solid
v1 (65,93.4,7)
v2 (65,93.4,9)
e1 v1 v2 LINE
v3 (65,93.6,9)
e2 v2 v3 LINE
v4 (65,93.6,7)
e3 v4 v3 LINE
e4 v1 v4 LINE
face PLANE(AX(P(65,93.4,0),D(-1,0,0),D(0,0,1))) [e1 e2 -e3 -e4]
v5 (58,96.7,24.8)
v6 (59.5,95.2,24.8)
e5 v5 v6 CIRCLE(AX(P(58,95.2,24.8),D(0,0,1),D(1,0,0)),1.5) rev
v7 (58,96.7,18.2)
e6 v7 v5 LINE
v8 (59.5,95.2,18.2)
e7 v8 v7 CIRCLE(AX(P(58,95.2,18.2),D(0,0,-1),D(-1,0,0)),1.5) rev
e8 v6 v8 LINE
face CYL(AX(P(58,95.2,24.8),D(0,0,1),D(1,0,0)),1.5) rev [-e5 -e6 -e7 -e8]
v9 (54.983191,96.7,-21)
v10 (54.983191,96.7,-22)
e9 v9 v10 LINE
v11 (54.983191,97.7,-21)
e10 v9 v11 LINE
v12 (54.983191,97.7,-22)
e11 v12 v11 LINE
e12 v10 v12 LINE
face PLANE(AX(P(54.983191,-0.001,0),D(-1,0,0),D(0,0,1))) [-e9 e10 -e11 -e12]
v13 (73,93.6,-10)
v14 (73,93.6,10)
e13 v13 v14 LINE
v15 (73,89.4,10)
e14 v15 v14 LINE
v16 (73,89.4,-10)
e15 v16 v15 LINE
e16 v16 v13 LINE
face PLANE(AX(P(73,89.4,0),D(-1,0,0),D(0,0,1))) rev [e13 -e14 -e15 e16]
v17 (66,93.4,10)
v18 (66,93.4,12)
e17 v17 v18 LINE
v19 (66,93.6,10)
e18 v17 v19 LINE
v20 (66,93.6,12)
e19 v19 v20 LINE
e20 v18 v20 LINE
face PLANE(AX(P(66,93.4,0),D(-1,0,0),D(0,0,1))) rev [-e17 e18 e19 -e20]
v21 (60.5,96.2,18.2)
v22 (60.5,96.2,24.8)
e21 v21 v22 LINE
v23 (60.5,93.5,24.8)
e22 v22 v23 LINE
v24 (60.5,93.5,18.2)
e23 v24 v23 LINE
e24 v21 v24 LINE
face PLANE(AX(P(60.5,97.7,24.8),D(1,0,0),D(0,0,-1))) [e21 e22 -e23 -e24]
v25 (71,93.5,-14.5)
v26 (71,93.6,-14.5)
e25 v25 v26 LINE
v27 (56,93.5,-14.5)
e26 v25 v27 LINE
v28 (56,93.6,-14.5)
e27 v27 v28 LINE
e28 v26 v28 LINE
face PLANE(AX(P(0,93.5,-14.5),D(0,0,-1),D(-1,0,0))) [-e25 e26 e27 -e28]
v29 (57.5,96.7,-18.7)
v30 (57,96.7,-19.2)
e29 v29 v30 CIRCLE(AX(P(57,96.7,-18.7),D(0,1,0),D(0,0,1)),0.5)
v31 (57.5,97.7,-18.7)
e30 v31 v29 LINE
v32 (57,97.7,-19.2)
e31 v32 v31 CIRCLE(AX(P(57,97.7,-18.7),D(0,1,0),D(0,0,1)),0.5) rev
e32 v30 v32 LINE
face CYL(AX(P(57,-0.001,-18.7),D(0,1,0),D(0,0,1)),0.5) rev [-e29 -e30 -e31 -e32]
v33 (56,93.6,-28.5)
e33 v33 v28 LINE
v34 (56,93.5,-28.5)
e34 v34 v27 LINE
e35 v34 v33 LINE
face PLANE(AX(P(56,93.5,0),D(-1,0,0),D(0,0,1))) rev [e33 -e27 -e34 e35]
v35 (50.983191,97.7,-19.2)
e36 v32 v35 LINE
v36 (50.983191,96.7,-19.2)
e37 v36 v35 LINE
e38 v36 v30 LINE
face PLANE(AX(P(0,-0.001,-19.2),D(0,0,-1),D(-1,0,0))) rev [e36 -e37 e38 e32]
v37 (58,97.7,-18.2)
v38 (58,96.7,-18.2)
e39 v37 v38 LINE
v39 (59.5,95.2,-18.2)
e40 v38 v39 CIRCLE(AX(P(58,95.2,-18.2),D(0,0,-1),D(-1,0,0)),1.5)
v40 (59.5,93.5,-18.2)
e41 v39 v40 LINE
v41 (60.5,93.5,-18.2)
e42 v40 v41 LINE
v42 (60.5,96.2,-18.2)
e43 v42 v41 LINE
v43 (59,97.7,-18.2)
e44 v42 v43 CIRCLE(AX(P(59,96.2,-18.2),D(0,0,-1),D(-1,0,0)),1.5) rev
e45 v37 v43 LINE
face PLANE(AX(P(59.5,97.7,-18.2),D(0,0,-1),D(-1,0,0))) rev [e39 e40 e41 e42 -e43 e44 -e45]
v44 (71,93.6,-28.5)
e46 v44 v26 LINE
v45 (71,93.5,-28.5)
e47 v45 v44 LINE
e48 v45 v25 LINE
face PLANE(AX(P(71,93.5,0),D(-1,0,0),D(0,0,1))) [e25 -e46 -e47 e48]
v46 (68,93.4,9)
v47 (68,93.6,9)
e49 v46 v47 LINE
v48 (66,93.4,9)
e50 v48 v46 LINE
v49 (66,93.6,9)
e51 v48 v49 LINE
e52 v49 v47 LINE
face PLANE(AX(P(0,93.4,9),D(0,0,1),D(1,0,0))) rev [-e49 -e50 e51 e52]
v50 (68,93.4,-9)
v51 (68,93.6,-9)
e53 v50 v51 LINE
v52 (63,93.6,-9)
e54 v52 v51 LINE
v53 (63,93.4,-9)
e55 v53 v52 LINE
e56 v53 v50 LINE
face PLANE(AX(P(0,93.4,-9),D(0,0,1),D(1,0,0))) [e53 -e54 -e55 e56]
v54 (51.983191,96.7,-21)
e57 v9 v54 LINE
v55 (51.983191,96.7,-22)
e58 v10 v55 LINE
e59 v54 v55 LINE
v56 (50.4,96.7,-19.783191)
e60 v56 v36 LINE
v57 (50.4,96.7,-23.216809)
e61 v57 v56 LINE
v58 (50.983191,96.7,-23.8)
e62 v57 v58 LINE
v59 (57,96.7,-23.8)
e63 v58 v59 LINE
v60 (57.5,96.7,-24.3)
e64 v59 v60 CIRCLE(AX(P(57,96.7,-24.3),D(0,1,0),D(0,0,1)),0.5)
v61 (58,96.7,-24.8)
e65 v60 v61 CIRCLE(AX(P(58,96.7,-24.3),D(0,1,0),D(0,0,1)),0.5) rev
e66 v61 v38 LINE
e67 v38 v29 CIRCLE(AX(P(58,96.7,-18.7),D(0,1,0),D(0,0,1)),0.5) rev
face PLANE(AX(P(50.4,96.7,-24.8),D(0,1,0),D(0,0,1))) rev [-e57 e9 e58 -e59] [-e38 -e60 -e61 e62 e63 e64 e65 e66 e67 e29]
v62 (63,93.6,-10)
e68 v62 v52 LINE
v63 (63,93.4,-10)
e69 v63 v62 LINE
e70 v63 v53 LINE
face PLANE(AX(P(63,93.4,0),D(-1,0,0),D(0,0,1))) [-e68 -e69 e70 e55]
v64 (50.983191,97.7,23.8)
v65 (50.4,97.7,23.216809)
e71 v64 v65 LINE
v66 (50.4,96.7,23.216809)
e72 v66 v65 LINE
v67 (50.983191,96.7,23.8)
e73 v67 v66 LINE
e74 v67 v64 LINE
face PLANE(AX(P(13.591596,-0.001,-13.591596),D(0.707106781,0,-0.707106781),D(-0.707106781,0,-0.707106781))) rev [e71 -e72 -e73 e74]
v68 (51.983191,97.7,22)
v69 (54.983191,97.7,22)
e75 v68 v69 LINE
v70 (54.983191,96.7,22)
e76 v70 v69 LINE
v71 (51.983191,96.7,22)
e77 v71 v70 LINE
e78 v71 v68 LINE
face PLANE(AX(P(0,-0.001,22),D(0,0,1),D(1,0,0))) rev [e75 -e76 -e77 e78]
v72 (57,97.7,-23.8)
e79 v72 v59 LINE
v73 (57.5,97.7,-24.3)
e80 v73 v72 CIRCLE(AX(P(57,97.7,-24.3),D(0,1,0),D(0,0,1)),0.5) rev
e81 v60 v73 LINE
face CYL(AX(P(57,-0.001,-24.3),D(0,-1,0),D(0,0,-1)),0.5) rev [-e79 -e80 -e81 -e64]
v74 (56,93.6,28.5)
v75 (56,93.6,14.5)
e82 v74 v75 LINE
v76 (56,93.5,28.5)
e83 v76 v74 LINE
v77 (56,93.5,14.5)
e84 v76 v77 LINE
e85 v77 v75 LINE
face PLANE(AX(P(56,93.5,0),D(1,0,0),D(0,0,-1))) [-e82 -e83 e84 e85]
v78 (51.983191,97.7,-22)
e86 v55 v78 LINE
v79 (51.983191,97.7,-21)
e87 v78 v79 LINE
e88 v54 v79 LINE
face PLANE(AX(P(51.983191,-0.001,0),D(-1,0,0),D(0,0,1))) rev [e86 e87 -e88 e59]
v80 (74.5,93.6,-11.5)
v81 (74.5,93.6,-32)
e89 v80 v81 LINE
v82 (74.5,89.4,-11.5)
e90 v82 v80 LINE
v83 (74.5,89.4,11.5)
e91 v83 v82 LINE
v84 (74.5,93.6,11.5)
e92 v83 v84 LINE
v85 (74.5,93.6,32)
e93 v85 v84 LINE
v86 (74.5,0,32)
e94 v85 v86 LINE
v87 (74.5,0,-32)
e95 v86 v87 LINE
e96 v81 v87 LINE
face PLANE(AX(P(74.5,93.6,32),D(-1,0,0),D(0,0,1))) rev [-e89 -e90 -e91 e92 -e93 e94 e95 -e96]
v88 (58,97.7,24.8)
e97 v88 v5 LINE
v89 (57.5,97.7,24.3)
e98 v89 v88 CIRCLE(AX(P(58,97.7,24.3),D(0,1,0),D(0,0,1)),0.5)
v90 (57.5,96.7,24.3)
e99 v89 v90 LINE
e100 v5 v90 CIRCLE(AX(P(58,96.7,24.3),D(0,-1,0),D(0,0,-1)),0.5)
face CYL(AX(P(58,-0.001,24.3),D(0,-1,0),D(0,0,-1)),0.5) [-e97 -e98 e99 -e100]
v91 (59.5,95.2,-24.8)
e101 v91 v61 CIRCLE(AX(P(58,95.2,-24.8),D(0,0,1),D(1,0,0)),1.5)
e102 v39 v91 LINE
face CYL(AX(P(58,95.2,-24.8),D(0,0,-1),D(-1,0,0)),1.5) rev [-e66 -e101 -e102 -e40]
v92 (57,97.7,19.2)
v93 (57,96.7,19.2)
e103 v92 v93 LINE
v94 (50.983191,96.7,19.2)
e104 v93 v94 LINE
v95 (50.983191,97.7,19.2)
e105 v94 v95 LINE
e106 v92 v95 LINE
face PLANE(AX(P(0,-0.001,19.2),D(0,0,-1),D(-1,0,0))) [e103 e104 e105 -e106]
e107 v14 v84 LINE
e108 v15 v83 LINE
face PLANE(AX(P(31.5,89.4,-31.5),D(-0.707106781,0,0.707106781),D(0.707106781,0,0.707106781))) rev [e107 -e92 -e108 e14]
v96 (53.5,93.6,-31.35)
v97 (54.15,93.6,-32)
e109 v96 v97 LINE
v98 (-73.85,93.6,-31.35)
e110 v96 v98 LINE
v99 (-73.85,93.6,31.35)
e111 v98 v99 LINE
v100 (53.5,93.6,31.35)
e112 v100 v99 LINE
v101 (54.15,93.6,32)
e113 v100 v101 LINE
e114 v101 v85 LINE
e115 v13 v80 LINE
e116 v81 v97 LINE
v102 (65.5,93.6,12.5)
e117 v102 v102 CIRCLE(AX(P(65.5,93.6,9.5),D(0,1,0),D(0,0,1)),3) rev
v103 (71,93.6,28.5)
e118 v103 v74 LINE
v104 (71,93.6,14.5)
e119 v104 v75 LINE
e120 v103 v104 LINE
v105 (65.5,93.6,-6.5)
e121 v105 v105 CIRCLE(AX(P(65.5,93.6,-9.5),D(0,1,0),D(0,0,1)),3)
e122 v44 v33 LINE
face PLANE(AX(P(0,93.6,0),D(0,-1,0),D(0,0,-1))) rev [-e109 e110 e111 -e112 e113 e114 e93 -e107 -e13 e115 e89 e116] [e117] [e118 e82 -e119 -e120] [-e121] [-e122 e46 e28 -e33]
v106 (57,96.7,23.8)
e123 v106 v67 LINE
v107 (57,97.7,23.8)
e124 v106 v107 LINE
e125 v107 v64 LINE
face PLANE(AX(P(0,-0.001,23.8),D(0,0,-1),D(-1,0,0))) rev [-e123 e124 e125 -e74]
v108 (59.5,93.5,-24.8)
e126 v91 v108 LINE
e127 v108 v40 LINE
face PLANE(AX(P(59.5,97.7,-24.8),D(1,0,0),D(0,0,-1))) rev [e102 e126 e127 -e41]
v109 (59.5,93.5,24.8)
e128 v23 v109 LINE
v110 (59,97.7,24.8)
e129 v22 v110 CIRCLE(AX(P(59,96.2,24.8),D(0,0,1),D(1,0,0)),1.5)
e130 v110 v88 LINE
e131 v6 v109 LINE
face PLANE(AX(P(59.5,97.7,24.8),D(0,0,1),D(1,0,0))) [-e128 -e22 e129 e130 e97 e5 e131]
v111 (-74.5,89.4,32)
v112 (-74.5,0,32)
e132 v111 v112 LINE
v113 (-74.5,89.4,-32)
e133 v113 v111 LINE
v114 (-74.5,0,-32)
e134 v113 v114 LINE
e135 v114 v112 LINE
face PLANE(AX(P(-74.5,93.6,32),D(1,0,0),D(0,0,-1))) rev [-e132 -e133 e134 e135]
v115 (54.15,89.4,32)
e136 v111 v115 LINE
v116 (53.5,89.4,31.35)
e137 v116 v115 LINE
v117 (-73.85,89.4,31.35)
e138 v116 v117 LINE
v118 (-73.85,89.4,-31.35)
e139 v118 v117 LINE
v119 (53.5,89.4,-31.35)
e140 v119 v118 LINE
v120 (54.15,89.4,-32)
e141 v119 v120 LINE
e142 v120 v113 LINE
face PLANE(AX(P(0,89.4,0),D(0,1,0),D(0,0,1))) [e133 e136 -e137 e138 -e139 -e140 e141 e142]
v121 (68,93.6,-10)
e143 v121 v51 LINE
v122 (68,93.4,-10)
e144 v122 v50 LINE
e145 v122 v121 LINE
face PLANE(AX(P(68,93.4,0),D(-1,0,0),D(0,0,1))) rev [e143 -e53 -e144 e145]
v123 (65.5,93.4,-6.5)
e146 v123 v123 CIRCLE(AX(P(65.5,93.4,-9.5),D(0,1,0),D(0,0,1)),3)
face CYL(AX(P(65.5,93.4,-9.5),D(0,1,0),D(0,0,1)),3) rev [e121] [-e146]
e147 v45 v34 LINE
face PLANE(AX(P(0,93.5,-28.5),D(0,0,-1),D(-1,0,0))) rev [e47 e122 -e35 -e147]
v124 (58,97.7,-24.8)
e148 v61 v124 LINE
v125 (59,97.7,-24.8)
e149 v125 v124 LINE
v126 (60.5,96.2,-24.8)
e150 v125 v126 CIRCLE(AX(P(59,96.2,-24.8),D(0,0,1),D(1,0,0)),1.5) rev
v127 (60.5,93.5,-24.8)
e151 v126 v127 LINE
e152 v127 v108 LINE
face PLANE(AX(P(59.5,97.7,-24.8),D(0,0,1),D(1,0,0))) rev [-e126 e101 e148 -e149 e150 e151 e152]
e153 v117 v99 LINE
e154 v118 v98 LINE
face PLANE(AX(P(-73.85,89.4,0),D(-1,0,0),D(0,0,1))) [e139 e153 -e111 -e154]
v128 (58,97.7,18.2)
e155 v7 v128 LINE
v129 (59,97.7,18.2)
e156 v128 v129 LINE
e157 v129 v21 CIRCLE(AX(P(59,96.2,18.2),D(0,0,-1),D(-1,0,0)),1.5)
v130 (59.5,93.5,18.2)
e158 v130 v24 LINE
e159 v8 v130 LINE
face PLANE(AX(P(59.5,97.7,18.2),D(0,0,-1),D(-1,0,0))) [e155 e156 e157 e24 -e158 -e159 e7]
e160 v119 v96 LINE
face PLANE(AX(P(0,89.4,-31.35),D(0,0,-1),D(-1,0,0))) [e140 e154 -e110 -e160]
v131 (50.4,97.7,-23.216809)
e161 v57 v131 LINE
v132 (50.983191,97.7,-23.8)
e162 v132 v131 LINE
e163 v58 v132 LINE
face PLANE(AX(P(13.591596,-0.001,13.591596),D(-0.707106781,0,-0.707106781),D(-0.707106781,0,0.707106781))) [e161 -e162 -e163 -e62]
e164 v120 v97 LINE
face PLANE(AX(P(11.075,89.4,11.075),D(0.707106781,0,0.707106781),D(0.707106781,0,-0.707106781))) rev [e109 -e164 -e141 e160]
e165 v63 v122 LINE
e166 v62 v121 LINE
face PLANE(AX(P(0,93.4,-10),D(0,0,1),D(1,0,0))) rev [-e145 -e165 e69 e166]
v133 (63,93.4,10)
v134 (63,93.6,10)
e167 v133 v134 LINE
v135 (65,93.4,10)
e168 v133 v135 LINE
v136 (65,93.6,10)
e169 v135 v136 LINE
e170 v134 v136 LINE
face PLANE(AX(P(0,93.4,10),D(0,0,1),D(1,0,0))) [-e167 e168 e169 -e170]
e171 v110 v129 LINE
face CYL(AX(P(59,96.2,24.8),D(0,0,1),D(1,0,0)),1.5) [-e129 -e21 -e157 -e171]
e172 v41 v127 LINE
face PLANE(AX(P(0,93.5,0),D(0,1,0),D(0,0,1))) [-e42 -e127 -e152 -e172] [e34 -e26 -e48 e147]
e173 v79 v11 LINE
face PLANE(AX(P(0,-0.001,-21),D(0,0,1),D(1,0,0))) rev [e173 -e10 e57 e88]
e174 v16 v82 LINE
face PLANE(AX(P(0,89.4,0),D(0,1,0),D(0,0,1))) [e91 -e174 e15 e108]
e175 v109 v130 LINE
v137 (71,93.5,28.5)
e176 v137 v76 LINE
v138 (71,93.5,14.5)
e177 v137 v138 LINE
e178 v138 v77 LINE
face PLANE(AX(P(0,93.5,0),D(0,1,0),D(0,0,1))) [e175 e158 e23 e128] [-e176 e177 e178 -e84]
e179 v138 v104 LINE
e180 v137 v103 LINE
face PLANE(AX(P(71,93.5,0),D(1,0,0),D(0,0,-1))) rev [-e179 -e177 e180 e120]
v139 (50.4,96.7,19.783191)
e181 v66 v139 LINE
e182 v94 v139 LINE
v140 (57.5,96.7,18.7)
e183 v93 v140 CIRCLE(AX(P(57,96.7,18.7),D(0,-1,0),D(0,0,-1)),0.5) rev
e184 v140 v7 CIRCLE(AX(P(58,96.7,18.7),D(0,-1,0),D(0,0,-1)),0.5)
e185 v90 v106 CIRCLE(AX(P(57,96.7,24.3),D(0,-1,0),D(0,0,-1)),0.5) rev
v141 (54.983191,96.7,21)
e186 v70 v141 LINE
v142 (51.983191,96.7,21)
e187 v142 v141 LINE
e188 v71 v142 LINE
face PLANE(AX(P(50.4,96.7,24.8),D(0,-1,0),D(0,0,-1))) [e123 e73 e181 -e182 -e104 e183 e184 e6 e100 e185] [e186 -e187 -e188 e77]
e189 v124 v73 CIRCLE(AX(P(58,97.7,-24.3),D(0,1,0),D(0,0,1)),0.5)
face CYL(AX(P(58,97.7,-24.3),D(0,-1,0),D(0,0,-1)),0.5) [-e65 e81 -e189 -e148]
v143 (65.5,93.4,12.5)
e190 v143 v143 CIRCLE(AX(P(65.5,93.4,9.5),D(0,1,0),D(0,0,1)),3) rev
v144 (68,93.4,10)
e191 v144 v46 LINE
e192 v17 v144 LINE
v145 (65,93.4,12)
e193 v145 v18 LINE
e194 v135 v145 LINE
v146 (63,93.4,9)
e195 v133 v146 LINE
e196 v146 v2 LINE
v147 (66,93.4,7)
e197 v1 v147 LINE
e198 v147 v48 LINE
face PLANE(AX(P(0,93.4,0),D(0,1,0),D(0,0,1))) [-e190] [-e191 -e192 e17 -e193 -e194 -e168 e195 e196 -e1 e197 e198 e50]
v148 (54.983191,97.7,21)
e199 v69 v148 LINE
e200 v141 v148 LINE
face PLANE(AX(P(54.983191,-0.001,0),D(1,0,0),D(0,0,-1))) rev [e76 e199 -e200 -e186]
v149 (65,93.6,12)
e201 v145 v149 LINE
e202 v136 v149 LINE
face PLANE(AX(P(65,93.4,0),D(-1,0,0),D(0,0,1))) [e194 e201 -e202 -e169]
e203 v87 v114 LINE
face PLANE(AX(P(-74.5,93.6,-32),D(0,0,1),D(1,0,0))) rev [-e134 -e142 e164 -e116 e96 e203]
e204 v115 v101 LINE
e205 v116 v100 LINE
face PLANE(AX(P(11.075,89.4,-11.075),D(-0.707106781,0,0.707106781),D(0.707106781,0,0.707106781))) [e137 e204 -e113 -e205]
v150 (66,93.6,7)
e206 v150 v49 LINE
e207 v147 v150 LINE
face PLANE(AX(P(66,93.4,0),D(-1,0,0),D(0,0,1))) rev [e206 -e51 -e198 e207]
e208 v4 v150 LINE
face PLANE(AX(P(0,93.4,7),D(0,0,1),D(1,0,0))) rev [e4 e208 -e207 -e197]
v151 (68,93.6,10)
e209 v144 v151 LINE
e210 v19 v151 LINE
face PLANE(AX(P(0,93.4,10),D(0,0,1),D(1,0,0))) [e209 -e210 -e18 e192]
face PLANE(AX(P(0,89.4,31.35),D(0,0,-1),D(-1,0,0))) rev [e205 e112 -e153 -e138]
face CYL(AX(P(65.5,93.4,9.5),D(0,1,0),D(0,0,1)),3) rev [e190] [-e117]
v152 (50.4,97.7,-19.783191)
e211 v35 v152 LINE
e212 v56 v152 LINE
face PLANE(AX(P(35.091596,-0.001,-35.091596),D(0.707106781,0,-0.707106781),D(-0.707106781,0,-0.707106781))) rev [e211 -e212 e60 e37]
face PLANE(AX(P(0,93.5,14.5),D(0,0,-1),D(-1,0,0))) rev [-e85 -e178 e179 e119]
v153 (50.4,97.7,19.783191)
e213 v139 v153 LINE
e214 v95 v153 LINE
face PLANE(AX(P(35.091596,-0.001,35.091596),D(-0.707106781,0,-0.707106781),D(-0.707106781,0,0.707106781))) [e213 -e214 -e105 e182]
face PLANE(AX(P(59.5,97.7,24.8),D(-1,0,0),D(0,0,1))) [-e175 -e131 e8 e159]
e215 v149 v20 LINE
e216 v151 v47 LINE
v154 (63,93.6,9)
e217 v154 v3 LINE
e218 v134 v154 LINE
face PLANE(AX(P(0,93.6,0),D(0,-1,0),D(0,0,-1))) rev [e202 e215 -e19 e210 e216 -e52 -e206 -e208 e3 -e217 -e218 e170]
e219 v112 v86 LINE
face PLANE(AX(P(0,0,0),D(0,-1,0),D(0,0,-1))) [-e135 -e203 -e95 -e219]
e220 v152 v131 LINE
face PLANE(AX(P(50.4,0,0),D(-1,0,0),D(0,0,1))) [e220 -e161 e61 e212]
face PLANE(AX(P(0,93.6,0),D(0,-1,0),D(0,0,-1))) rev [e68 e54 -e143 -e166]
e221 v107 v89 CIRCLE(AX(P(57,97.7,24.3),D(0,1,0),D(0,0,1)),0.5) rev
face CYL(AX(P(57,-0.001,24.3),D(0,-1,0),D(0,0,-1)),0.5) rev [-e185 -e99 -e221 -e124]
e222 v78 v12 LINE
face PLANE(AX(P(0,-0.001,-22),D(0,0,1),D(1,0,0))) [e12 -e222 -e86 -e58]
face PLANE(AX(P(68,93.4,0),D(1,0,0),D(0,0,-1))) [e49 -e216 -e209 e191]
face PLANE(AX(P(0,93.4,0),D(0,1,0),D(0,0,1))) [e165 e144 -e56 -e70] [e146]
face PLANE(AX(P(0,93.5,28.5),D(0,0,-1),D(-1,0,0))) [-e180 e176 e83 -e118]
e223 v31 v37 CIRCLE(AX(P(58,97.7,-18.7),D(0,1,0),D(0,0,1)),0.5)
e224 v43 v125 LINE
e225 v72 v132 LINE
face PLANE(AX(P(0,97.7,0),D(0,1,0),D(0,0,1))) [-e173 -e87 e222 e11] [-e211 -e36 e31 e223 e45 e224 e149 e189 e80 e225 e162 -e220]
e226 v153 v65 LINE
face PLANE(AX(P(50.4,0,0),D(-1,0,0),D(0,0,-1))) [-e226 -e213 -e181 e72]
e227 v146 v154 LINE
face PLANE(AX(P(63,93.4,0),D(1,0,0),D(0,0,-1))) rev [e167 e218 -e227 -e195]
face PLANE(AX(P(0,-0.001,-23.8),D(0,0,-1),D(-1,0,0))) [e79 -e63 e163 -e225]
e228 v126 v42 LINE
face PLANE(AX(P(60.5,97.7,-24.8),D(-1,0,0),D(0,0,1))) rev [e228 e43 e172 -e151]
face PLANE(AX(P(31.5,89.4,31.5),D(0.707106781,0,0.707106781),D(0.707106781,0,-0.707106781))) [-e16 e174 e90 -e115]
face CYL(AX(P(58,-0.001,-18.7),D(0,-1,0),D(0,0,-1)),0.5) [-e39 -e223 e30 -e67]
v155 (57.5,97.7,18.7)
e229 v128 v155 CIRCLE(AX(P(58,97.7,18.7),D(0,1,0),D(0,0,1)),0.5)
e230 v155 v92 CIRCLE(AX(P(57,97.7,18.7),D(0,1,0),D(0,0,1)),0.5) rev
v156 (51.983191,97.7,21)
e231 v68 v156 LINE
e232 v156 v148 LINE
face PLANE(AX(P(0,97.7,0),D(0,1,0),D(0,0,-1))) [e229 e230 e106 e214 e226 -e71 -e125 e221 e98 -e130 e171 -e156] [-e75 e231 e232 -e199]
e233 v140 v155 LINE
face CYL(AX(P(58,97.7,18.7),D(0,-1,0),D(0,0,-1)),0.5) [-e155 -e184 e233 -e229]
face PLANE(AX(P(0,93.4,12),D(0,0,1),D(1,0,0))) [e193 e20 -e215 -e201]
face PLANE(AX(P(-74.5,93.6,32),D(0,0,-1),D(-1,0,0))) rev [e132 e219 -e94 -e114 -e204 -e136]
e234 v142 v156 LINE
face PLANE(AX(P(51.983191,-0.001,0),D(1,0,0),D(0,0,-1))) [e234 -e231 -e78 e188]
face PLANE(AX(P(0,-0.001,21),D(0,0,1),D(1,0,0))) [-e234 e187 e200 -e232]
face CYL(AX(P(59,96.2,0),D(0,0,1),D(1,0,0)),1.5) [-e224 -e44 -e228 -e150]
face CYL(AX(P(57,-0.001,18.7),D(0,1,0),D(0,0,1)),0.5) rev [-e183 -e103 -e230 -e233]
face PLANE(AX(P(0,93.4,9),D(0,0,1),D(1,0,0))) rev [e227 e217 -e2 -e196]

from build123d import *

# Parameters (mm, degrees)
SKETCH1_W            = 149
SKETCH1_H            = 64
BOSS_EXTRUDE1_DEPTH  = 93.6
SKETCH2_W            = 1.5
SKETCH2_H            = 20
CUT_EXTRUDE1_DEPTH   = 4.2
SKETCH2_3_W          = 15
SKETCH2_3_H          = 14
CUT_EXTRUDE2_DEPTH   = 0.1
SKETCH2_4_R          = 3
SKETCH2_4_W          = 5
SKETCH2_4_H          = 1
CUT_EXTRUDE3_DEPTH   = 0.2
SKETCH3_W            = 1
SKETCH3_H            = 6.6
BOSS_EXTRUDE2_DEPTH  = 4.2
SKETCH4_W            = 6.6
SKETCH4_H            = 1
BOSS_EXTRUDE3_DEPTH  = 9.1
CUT_EXTRUDE4_REACH   = 128.963
SKETCH5_W            = 3
SKETCH5_H            = 1
FILLET1_START        = 93.5
FILLET1_DEPTH        = 5.5
FILLET1_START_2      = 96.7
FILLET1_2_DEPTH      = 1
FILLET2_R            = 1.5
FILLET2_OF_MIRROR1_R = 1.5


with BuildPart() as part:
    # Sketch1 → Boss-Extrude1 (new body)
    with BuildSketch(Plane(origin=(0, 0, 0), x_dir=(1, 0, 0), z_dir=(0, 1, 0))):
        Rectangle(SKETCH1_W, SKETCH1_H)
    extrude(amount=BOSS_EXTRUDE1_DEPTH)

    # Sketch2 → Cut-Extrude1 (cut)
    with BuildSketch(Plane(origin=(0, 93.6, 0), x_dir=(1, 0, 0), z_dir=(0, 1, 0))):
        with Locations((73.75, 0)):
            Rectangle(SKETCH2_W, SKETCH2_H)
        Polygon((74.5, 10), (74.5, 11.5), (73, 10), align=None)
        Polygon((73, -10), (74.5, -11.5), (74.5, -10), align=None)
        Polygon((54.15, -32), (53.5, -31.35), (-73.85, -31.35), (-73.85, 31.35), (53.5, 31.35), (54.15, 32), (-74.5, 32), (-74.5, -32), align=None)
    extrude(amount=-CUT_EXTRUDE1_DEPTH, mode=Mode.SUBTRACT)

    # Sketch2<3> → Cut-Extrude2 (cut)
    with BuildSketch(Plane(origin=(0, 93.6, 0), x_dir=(1, 0, 0), z_dir=(0, 1, 0))):
        with Locations((63.5, 21.5)):
            Rectangle(SKETCH2_3_W, SKETCH2_3_H)
        with Locations((63.5, -21.5)):
            Rectangle(SKETCH2_3_W, SKETCH2_3_H)
    extrude(amount=-CUT_EXTRUDE2_DEPTH, mode=Mode.SUBTRACT)

    # Sketch2<4> → Cut-Extrude3 (cut)
    # profile 1 of 2: a face of its own
    with BuildSketch(Plane(origin=(0, 93.6, 0), x_dir=(1, 0, 0), z_dir=(0, 1, 0))):
        with Locations(Location((65.5, 9.5, 0), (0, 0, 270))):
            Circle(SKETCH2_4_R)
        with Locations((65.5, 9.5)):
            Rectangle(SKETCH2_4_W, SKETCH2_4_H, mode=Mode.SUBTRACT)
    # profile 2 of 2: a face of its own
    with BuildSketch(Plane(origin=(0, 93.6, 0), x_dir=(1, 0, 0), z_dir=(0, 1, 0))):
        with Locations(Location((65.5, -9.5, 0), (0, 0, 270))):
            Circle(SKETCH2_4_R)
        Polygon((68, -9), (68, -10), (66, -10), (66, -12), (65, -12), (65, -10), (63, -10), (63, -9), (65, -9), (65, -7), (66, -7), (66, -9), align=None, mode=Mode.SUBTRACT)
    extrude(amount=-CUT_EXTRUDE3_DEPTH, mode=Mode.SUBTRACT)

    # Sketch3 → Boss-Extrude2 (add)
    with BuildSketch(Plane(origin=(0, 93.5, 0), x_dir=(1, 0, 0), z_dir=(0, 1, 0))):
        with Locations((60, 21.5)):
            Rectangle(SKETCH3_W, SKETCH3_H)
    boss_extrude2 = extrude(amount=BOSS_EXTRUDE2_DEPTH)

    # Sketch4 → Boss-Extrude3 (add)
    with BuildSketch(Plane.ZY.offset(-59.5)):
        with Locations((-21.5, 97.2)):
            Rectangle(SKETCH4_W, SKETCH4_H)
    boss_extrude3 = extrude(amount=BOSS_EXTRUDE3_DEPTH)

    # Sketch5 → Cut-Extrude4 (cut, up to next)
    with BuildSketch(Plane(origin=(0, 97.7, 0), x_dir=(1, 0, 0), z_dir=(0, 1, 0)), mode=Mode.PRIVATE) as cut_extrude4_sk1:
        Polygon((57.5, 23.8), (57.5, 24.8), (49.983191487, 24.8), (49.983191487, 22.8), (50.983191487, 23.8), align=None)
    cut_extrude4_tool1 = extrude(cut_extrude4_sk1.sketch, amount=-CUT_EXTRUDE4_REACH, mode=Mode.PRIVATE) & part.part
    # Sketch5 → Cut-Extrude4 (cut, up to next)
    with BuildSketch(Plane(origin=(0, 97.7, 0), x_dir=(1, 0, 0), z_dir=(0, 1, 0)), mode=Mode.PRIVATE) as cut_extrude4_sk2:
        Polygon((57.5, 18.2), (57.5, 19.2), (50.983191487, 19.2), (49.983191487, 20.2), (49.983191487, 18.2), align=None)
    cut_extrude4_tool2 = extrude(cut_extrude4_sk2.sketch, amount=-CUT_EXTRUDE4_REACH, mode=Mode.PRIVATE) & part.part
    # Sketch5 → Cut-Extrude4 (cut, up to next)
    with BuildSketch(Plane(origin=(0, 97.7, 0), x_dir=(1, 0, 0), z_dir=(0, 1, 0)), mode=Mode.PRIVATE) as cut_extrude4_sk3:
        with Locations((53.483191487, 21.5)):
            Rectangle(SKETCH5_W, SKETCH5_H)
    cut_extrude4_tool3 = extrude(cut_extrude4_sk3.sketch, amount=-CUT_EXTRUDE4_REACH, mode=Mode.PRIVATE) & part.part
    cut_extrude4_1 = cut_extrude4_tool1.solids().sort_by_distance((53.527978, 97.7, -24.248026))[0]
    add(cut_extrude4_1, mode=Mode.SUBTRACT)
    cut_extrude4_2 = cut_extrude4_tool2.solids().sort_by_distance((53.527978, 97.7, -18.751974))[0]
    add(cut_extrude4_2, mode=Mode.SUBTRACT)
    cut_extrude4_3 = cut_extrude4_tool3.solids().sort_by_distance((53.483191, 97.7, -21.5))[0]
    add(cut_extrude4_3, mode=Mode.SUBTRACT)
    cut_extrude4 = cut_extrude4_1 + cut_extrude4_2 + cut_extrude4_3  # Cut-Extrude4 as one shape, for the pattern or mirror that repeats it

    # Fillet1: read off the stored shape, not the designer's step
    # Fillet1 outline → Fillet1 (cut)
    with BuildSketch(Plane(origin=(0, 0, 0), x_dir=(1, 0, 0), z_dir=(0, 1, 0)).offset(FILLET1_START)):
        with BuildLine():
            ThreePointArc((58, 18.2), (57.646446609, 18.346446609), (57.5, 18.7))
            Line((57.5, 18.7), (57.5, 18.2))
            Line((57.5, 18.2), (58, 18.2))
        make_face()
        with BuildLine():
            Line((57.5, 24.8), (57.5, 24.3))
            ThreePointArc((57.5, 24.3), (57.646446609, 24.653553391), (58, 24.8))
            Line((58, 24.8), (57.5, 24.8))
        make_face()
    fillet1 = extrude(amount=FILLET1_DEPTH, mode=Mode.SUBTRACT)

    # Fillet1 2 outline → Fillet1 2 (add)
    with BuildSketch(Plane(origin=(0, 0, 0), x_dir=(1, 0, 0), z_dir=(0, 1, 0)).offset(FILLET1_START_2)):
        with BuildLine():
            ThreePointArc((57, 19.2), (57.353553391, 19.053553391), (57.5, 18.7))
            Line((57.5, 18.7), (57.5, 19.2))
            Line((57.5, 19.2), (57, 19.2))
        make_face()
        with BuildLine():
            Line((57.5, 23.8), (57.5, 24.3))
            ThreePointArc((57.5, 24.3), (57.353553391, 23.946446609), (57, 23.8))
            Line((57, 23.8), (57.5, 23.8))
        make_face()
    fillet1_2 = extrude(amount=FILLET1_2_DEPTH)

    # Fillet2
    fillet2_edges = [part.edges().sort_by_distance(p)[0] for p in [
        (59.5, 96.7, -21.5),
        (60.5, 97.7, -21.5),
    ]]
    fillet(fillet2_edges, radius=FILLET2_R)

    # Mirror1: Boss-Extrude2, Boss-Extrude3, Cut-Extrude4, Fillet1, Fillet1 2 across plane
    add(boss_extrude2.mirror(Plane.XY))
    add(boss_extrude3.mirror(Plane.XY))
    add(cut_extrude4.mirror(Plane.XY), mode=Mode.SUBTRACT)
    add(fillet1.mirror(Plane.XY), mode=Mode.SUBTRACT)
    add(fillet1_2.mirror(Plane.XY))

    # Fillet2 of Mirror1
    fillet2_of_mirror1_edges = [part.edges().sort_by_distance(p)[0] for p in [
        (59.5, 96.7, 21.5),
        (60.5, 97.7, 21.5),
    ]]
    fillet(fillet2_of_mirror1_edges, radius=FILLET2_OF_MIRROR1_R)


solid = part.part
